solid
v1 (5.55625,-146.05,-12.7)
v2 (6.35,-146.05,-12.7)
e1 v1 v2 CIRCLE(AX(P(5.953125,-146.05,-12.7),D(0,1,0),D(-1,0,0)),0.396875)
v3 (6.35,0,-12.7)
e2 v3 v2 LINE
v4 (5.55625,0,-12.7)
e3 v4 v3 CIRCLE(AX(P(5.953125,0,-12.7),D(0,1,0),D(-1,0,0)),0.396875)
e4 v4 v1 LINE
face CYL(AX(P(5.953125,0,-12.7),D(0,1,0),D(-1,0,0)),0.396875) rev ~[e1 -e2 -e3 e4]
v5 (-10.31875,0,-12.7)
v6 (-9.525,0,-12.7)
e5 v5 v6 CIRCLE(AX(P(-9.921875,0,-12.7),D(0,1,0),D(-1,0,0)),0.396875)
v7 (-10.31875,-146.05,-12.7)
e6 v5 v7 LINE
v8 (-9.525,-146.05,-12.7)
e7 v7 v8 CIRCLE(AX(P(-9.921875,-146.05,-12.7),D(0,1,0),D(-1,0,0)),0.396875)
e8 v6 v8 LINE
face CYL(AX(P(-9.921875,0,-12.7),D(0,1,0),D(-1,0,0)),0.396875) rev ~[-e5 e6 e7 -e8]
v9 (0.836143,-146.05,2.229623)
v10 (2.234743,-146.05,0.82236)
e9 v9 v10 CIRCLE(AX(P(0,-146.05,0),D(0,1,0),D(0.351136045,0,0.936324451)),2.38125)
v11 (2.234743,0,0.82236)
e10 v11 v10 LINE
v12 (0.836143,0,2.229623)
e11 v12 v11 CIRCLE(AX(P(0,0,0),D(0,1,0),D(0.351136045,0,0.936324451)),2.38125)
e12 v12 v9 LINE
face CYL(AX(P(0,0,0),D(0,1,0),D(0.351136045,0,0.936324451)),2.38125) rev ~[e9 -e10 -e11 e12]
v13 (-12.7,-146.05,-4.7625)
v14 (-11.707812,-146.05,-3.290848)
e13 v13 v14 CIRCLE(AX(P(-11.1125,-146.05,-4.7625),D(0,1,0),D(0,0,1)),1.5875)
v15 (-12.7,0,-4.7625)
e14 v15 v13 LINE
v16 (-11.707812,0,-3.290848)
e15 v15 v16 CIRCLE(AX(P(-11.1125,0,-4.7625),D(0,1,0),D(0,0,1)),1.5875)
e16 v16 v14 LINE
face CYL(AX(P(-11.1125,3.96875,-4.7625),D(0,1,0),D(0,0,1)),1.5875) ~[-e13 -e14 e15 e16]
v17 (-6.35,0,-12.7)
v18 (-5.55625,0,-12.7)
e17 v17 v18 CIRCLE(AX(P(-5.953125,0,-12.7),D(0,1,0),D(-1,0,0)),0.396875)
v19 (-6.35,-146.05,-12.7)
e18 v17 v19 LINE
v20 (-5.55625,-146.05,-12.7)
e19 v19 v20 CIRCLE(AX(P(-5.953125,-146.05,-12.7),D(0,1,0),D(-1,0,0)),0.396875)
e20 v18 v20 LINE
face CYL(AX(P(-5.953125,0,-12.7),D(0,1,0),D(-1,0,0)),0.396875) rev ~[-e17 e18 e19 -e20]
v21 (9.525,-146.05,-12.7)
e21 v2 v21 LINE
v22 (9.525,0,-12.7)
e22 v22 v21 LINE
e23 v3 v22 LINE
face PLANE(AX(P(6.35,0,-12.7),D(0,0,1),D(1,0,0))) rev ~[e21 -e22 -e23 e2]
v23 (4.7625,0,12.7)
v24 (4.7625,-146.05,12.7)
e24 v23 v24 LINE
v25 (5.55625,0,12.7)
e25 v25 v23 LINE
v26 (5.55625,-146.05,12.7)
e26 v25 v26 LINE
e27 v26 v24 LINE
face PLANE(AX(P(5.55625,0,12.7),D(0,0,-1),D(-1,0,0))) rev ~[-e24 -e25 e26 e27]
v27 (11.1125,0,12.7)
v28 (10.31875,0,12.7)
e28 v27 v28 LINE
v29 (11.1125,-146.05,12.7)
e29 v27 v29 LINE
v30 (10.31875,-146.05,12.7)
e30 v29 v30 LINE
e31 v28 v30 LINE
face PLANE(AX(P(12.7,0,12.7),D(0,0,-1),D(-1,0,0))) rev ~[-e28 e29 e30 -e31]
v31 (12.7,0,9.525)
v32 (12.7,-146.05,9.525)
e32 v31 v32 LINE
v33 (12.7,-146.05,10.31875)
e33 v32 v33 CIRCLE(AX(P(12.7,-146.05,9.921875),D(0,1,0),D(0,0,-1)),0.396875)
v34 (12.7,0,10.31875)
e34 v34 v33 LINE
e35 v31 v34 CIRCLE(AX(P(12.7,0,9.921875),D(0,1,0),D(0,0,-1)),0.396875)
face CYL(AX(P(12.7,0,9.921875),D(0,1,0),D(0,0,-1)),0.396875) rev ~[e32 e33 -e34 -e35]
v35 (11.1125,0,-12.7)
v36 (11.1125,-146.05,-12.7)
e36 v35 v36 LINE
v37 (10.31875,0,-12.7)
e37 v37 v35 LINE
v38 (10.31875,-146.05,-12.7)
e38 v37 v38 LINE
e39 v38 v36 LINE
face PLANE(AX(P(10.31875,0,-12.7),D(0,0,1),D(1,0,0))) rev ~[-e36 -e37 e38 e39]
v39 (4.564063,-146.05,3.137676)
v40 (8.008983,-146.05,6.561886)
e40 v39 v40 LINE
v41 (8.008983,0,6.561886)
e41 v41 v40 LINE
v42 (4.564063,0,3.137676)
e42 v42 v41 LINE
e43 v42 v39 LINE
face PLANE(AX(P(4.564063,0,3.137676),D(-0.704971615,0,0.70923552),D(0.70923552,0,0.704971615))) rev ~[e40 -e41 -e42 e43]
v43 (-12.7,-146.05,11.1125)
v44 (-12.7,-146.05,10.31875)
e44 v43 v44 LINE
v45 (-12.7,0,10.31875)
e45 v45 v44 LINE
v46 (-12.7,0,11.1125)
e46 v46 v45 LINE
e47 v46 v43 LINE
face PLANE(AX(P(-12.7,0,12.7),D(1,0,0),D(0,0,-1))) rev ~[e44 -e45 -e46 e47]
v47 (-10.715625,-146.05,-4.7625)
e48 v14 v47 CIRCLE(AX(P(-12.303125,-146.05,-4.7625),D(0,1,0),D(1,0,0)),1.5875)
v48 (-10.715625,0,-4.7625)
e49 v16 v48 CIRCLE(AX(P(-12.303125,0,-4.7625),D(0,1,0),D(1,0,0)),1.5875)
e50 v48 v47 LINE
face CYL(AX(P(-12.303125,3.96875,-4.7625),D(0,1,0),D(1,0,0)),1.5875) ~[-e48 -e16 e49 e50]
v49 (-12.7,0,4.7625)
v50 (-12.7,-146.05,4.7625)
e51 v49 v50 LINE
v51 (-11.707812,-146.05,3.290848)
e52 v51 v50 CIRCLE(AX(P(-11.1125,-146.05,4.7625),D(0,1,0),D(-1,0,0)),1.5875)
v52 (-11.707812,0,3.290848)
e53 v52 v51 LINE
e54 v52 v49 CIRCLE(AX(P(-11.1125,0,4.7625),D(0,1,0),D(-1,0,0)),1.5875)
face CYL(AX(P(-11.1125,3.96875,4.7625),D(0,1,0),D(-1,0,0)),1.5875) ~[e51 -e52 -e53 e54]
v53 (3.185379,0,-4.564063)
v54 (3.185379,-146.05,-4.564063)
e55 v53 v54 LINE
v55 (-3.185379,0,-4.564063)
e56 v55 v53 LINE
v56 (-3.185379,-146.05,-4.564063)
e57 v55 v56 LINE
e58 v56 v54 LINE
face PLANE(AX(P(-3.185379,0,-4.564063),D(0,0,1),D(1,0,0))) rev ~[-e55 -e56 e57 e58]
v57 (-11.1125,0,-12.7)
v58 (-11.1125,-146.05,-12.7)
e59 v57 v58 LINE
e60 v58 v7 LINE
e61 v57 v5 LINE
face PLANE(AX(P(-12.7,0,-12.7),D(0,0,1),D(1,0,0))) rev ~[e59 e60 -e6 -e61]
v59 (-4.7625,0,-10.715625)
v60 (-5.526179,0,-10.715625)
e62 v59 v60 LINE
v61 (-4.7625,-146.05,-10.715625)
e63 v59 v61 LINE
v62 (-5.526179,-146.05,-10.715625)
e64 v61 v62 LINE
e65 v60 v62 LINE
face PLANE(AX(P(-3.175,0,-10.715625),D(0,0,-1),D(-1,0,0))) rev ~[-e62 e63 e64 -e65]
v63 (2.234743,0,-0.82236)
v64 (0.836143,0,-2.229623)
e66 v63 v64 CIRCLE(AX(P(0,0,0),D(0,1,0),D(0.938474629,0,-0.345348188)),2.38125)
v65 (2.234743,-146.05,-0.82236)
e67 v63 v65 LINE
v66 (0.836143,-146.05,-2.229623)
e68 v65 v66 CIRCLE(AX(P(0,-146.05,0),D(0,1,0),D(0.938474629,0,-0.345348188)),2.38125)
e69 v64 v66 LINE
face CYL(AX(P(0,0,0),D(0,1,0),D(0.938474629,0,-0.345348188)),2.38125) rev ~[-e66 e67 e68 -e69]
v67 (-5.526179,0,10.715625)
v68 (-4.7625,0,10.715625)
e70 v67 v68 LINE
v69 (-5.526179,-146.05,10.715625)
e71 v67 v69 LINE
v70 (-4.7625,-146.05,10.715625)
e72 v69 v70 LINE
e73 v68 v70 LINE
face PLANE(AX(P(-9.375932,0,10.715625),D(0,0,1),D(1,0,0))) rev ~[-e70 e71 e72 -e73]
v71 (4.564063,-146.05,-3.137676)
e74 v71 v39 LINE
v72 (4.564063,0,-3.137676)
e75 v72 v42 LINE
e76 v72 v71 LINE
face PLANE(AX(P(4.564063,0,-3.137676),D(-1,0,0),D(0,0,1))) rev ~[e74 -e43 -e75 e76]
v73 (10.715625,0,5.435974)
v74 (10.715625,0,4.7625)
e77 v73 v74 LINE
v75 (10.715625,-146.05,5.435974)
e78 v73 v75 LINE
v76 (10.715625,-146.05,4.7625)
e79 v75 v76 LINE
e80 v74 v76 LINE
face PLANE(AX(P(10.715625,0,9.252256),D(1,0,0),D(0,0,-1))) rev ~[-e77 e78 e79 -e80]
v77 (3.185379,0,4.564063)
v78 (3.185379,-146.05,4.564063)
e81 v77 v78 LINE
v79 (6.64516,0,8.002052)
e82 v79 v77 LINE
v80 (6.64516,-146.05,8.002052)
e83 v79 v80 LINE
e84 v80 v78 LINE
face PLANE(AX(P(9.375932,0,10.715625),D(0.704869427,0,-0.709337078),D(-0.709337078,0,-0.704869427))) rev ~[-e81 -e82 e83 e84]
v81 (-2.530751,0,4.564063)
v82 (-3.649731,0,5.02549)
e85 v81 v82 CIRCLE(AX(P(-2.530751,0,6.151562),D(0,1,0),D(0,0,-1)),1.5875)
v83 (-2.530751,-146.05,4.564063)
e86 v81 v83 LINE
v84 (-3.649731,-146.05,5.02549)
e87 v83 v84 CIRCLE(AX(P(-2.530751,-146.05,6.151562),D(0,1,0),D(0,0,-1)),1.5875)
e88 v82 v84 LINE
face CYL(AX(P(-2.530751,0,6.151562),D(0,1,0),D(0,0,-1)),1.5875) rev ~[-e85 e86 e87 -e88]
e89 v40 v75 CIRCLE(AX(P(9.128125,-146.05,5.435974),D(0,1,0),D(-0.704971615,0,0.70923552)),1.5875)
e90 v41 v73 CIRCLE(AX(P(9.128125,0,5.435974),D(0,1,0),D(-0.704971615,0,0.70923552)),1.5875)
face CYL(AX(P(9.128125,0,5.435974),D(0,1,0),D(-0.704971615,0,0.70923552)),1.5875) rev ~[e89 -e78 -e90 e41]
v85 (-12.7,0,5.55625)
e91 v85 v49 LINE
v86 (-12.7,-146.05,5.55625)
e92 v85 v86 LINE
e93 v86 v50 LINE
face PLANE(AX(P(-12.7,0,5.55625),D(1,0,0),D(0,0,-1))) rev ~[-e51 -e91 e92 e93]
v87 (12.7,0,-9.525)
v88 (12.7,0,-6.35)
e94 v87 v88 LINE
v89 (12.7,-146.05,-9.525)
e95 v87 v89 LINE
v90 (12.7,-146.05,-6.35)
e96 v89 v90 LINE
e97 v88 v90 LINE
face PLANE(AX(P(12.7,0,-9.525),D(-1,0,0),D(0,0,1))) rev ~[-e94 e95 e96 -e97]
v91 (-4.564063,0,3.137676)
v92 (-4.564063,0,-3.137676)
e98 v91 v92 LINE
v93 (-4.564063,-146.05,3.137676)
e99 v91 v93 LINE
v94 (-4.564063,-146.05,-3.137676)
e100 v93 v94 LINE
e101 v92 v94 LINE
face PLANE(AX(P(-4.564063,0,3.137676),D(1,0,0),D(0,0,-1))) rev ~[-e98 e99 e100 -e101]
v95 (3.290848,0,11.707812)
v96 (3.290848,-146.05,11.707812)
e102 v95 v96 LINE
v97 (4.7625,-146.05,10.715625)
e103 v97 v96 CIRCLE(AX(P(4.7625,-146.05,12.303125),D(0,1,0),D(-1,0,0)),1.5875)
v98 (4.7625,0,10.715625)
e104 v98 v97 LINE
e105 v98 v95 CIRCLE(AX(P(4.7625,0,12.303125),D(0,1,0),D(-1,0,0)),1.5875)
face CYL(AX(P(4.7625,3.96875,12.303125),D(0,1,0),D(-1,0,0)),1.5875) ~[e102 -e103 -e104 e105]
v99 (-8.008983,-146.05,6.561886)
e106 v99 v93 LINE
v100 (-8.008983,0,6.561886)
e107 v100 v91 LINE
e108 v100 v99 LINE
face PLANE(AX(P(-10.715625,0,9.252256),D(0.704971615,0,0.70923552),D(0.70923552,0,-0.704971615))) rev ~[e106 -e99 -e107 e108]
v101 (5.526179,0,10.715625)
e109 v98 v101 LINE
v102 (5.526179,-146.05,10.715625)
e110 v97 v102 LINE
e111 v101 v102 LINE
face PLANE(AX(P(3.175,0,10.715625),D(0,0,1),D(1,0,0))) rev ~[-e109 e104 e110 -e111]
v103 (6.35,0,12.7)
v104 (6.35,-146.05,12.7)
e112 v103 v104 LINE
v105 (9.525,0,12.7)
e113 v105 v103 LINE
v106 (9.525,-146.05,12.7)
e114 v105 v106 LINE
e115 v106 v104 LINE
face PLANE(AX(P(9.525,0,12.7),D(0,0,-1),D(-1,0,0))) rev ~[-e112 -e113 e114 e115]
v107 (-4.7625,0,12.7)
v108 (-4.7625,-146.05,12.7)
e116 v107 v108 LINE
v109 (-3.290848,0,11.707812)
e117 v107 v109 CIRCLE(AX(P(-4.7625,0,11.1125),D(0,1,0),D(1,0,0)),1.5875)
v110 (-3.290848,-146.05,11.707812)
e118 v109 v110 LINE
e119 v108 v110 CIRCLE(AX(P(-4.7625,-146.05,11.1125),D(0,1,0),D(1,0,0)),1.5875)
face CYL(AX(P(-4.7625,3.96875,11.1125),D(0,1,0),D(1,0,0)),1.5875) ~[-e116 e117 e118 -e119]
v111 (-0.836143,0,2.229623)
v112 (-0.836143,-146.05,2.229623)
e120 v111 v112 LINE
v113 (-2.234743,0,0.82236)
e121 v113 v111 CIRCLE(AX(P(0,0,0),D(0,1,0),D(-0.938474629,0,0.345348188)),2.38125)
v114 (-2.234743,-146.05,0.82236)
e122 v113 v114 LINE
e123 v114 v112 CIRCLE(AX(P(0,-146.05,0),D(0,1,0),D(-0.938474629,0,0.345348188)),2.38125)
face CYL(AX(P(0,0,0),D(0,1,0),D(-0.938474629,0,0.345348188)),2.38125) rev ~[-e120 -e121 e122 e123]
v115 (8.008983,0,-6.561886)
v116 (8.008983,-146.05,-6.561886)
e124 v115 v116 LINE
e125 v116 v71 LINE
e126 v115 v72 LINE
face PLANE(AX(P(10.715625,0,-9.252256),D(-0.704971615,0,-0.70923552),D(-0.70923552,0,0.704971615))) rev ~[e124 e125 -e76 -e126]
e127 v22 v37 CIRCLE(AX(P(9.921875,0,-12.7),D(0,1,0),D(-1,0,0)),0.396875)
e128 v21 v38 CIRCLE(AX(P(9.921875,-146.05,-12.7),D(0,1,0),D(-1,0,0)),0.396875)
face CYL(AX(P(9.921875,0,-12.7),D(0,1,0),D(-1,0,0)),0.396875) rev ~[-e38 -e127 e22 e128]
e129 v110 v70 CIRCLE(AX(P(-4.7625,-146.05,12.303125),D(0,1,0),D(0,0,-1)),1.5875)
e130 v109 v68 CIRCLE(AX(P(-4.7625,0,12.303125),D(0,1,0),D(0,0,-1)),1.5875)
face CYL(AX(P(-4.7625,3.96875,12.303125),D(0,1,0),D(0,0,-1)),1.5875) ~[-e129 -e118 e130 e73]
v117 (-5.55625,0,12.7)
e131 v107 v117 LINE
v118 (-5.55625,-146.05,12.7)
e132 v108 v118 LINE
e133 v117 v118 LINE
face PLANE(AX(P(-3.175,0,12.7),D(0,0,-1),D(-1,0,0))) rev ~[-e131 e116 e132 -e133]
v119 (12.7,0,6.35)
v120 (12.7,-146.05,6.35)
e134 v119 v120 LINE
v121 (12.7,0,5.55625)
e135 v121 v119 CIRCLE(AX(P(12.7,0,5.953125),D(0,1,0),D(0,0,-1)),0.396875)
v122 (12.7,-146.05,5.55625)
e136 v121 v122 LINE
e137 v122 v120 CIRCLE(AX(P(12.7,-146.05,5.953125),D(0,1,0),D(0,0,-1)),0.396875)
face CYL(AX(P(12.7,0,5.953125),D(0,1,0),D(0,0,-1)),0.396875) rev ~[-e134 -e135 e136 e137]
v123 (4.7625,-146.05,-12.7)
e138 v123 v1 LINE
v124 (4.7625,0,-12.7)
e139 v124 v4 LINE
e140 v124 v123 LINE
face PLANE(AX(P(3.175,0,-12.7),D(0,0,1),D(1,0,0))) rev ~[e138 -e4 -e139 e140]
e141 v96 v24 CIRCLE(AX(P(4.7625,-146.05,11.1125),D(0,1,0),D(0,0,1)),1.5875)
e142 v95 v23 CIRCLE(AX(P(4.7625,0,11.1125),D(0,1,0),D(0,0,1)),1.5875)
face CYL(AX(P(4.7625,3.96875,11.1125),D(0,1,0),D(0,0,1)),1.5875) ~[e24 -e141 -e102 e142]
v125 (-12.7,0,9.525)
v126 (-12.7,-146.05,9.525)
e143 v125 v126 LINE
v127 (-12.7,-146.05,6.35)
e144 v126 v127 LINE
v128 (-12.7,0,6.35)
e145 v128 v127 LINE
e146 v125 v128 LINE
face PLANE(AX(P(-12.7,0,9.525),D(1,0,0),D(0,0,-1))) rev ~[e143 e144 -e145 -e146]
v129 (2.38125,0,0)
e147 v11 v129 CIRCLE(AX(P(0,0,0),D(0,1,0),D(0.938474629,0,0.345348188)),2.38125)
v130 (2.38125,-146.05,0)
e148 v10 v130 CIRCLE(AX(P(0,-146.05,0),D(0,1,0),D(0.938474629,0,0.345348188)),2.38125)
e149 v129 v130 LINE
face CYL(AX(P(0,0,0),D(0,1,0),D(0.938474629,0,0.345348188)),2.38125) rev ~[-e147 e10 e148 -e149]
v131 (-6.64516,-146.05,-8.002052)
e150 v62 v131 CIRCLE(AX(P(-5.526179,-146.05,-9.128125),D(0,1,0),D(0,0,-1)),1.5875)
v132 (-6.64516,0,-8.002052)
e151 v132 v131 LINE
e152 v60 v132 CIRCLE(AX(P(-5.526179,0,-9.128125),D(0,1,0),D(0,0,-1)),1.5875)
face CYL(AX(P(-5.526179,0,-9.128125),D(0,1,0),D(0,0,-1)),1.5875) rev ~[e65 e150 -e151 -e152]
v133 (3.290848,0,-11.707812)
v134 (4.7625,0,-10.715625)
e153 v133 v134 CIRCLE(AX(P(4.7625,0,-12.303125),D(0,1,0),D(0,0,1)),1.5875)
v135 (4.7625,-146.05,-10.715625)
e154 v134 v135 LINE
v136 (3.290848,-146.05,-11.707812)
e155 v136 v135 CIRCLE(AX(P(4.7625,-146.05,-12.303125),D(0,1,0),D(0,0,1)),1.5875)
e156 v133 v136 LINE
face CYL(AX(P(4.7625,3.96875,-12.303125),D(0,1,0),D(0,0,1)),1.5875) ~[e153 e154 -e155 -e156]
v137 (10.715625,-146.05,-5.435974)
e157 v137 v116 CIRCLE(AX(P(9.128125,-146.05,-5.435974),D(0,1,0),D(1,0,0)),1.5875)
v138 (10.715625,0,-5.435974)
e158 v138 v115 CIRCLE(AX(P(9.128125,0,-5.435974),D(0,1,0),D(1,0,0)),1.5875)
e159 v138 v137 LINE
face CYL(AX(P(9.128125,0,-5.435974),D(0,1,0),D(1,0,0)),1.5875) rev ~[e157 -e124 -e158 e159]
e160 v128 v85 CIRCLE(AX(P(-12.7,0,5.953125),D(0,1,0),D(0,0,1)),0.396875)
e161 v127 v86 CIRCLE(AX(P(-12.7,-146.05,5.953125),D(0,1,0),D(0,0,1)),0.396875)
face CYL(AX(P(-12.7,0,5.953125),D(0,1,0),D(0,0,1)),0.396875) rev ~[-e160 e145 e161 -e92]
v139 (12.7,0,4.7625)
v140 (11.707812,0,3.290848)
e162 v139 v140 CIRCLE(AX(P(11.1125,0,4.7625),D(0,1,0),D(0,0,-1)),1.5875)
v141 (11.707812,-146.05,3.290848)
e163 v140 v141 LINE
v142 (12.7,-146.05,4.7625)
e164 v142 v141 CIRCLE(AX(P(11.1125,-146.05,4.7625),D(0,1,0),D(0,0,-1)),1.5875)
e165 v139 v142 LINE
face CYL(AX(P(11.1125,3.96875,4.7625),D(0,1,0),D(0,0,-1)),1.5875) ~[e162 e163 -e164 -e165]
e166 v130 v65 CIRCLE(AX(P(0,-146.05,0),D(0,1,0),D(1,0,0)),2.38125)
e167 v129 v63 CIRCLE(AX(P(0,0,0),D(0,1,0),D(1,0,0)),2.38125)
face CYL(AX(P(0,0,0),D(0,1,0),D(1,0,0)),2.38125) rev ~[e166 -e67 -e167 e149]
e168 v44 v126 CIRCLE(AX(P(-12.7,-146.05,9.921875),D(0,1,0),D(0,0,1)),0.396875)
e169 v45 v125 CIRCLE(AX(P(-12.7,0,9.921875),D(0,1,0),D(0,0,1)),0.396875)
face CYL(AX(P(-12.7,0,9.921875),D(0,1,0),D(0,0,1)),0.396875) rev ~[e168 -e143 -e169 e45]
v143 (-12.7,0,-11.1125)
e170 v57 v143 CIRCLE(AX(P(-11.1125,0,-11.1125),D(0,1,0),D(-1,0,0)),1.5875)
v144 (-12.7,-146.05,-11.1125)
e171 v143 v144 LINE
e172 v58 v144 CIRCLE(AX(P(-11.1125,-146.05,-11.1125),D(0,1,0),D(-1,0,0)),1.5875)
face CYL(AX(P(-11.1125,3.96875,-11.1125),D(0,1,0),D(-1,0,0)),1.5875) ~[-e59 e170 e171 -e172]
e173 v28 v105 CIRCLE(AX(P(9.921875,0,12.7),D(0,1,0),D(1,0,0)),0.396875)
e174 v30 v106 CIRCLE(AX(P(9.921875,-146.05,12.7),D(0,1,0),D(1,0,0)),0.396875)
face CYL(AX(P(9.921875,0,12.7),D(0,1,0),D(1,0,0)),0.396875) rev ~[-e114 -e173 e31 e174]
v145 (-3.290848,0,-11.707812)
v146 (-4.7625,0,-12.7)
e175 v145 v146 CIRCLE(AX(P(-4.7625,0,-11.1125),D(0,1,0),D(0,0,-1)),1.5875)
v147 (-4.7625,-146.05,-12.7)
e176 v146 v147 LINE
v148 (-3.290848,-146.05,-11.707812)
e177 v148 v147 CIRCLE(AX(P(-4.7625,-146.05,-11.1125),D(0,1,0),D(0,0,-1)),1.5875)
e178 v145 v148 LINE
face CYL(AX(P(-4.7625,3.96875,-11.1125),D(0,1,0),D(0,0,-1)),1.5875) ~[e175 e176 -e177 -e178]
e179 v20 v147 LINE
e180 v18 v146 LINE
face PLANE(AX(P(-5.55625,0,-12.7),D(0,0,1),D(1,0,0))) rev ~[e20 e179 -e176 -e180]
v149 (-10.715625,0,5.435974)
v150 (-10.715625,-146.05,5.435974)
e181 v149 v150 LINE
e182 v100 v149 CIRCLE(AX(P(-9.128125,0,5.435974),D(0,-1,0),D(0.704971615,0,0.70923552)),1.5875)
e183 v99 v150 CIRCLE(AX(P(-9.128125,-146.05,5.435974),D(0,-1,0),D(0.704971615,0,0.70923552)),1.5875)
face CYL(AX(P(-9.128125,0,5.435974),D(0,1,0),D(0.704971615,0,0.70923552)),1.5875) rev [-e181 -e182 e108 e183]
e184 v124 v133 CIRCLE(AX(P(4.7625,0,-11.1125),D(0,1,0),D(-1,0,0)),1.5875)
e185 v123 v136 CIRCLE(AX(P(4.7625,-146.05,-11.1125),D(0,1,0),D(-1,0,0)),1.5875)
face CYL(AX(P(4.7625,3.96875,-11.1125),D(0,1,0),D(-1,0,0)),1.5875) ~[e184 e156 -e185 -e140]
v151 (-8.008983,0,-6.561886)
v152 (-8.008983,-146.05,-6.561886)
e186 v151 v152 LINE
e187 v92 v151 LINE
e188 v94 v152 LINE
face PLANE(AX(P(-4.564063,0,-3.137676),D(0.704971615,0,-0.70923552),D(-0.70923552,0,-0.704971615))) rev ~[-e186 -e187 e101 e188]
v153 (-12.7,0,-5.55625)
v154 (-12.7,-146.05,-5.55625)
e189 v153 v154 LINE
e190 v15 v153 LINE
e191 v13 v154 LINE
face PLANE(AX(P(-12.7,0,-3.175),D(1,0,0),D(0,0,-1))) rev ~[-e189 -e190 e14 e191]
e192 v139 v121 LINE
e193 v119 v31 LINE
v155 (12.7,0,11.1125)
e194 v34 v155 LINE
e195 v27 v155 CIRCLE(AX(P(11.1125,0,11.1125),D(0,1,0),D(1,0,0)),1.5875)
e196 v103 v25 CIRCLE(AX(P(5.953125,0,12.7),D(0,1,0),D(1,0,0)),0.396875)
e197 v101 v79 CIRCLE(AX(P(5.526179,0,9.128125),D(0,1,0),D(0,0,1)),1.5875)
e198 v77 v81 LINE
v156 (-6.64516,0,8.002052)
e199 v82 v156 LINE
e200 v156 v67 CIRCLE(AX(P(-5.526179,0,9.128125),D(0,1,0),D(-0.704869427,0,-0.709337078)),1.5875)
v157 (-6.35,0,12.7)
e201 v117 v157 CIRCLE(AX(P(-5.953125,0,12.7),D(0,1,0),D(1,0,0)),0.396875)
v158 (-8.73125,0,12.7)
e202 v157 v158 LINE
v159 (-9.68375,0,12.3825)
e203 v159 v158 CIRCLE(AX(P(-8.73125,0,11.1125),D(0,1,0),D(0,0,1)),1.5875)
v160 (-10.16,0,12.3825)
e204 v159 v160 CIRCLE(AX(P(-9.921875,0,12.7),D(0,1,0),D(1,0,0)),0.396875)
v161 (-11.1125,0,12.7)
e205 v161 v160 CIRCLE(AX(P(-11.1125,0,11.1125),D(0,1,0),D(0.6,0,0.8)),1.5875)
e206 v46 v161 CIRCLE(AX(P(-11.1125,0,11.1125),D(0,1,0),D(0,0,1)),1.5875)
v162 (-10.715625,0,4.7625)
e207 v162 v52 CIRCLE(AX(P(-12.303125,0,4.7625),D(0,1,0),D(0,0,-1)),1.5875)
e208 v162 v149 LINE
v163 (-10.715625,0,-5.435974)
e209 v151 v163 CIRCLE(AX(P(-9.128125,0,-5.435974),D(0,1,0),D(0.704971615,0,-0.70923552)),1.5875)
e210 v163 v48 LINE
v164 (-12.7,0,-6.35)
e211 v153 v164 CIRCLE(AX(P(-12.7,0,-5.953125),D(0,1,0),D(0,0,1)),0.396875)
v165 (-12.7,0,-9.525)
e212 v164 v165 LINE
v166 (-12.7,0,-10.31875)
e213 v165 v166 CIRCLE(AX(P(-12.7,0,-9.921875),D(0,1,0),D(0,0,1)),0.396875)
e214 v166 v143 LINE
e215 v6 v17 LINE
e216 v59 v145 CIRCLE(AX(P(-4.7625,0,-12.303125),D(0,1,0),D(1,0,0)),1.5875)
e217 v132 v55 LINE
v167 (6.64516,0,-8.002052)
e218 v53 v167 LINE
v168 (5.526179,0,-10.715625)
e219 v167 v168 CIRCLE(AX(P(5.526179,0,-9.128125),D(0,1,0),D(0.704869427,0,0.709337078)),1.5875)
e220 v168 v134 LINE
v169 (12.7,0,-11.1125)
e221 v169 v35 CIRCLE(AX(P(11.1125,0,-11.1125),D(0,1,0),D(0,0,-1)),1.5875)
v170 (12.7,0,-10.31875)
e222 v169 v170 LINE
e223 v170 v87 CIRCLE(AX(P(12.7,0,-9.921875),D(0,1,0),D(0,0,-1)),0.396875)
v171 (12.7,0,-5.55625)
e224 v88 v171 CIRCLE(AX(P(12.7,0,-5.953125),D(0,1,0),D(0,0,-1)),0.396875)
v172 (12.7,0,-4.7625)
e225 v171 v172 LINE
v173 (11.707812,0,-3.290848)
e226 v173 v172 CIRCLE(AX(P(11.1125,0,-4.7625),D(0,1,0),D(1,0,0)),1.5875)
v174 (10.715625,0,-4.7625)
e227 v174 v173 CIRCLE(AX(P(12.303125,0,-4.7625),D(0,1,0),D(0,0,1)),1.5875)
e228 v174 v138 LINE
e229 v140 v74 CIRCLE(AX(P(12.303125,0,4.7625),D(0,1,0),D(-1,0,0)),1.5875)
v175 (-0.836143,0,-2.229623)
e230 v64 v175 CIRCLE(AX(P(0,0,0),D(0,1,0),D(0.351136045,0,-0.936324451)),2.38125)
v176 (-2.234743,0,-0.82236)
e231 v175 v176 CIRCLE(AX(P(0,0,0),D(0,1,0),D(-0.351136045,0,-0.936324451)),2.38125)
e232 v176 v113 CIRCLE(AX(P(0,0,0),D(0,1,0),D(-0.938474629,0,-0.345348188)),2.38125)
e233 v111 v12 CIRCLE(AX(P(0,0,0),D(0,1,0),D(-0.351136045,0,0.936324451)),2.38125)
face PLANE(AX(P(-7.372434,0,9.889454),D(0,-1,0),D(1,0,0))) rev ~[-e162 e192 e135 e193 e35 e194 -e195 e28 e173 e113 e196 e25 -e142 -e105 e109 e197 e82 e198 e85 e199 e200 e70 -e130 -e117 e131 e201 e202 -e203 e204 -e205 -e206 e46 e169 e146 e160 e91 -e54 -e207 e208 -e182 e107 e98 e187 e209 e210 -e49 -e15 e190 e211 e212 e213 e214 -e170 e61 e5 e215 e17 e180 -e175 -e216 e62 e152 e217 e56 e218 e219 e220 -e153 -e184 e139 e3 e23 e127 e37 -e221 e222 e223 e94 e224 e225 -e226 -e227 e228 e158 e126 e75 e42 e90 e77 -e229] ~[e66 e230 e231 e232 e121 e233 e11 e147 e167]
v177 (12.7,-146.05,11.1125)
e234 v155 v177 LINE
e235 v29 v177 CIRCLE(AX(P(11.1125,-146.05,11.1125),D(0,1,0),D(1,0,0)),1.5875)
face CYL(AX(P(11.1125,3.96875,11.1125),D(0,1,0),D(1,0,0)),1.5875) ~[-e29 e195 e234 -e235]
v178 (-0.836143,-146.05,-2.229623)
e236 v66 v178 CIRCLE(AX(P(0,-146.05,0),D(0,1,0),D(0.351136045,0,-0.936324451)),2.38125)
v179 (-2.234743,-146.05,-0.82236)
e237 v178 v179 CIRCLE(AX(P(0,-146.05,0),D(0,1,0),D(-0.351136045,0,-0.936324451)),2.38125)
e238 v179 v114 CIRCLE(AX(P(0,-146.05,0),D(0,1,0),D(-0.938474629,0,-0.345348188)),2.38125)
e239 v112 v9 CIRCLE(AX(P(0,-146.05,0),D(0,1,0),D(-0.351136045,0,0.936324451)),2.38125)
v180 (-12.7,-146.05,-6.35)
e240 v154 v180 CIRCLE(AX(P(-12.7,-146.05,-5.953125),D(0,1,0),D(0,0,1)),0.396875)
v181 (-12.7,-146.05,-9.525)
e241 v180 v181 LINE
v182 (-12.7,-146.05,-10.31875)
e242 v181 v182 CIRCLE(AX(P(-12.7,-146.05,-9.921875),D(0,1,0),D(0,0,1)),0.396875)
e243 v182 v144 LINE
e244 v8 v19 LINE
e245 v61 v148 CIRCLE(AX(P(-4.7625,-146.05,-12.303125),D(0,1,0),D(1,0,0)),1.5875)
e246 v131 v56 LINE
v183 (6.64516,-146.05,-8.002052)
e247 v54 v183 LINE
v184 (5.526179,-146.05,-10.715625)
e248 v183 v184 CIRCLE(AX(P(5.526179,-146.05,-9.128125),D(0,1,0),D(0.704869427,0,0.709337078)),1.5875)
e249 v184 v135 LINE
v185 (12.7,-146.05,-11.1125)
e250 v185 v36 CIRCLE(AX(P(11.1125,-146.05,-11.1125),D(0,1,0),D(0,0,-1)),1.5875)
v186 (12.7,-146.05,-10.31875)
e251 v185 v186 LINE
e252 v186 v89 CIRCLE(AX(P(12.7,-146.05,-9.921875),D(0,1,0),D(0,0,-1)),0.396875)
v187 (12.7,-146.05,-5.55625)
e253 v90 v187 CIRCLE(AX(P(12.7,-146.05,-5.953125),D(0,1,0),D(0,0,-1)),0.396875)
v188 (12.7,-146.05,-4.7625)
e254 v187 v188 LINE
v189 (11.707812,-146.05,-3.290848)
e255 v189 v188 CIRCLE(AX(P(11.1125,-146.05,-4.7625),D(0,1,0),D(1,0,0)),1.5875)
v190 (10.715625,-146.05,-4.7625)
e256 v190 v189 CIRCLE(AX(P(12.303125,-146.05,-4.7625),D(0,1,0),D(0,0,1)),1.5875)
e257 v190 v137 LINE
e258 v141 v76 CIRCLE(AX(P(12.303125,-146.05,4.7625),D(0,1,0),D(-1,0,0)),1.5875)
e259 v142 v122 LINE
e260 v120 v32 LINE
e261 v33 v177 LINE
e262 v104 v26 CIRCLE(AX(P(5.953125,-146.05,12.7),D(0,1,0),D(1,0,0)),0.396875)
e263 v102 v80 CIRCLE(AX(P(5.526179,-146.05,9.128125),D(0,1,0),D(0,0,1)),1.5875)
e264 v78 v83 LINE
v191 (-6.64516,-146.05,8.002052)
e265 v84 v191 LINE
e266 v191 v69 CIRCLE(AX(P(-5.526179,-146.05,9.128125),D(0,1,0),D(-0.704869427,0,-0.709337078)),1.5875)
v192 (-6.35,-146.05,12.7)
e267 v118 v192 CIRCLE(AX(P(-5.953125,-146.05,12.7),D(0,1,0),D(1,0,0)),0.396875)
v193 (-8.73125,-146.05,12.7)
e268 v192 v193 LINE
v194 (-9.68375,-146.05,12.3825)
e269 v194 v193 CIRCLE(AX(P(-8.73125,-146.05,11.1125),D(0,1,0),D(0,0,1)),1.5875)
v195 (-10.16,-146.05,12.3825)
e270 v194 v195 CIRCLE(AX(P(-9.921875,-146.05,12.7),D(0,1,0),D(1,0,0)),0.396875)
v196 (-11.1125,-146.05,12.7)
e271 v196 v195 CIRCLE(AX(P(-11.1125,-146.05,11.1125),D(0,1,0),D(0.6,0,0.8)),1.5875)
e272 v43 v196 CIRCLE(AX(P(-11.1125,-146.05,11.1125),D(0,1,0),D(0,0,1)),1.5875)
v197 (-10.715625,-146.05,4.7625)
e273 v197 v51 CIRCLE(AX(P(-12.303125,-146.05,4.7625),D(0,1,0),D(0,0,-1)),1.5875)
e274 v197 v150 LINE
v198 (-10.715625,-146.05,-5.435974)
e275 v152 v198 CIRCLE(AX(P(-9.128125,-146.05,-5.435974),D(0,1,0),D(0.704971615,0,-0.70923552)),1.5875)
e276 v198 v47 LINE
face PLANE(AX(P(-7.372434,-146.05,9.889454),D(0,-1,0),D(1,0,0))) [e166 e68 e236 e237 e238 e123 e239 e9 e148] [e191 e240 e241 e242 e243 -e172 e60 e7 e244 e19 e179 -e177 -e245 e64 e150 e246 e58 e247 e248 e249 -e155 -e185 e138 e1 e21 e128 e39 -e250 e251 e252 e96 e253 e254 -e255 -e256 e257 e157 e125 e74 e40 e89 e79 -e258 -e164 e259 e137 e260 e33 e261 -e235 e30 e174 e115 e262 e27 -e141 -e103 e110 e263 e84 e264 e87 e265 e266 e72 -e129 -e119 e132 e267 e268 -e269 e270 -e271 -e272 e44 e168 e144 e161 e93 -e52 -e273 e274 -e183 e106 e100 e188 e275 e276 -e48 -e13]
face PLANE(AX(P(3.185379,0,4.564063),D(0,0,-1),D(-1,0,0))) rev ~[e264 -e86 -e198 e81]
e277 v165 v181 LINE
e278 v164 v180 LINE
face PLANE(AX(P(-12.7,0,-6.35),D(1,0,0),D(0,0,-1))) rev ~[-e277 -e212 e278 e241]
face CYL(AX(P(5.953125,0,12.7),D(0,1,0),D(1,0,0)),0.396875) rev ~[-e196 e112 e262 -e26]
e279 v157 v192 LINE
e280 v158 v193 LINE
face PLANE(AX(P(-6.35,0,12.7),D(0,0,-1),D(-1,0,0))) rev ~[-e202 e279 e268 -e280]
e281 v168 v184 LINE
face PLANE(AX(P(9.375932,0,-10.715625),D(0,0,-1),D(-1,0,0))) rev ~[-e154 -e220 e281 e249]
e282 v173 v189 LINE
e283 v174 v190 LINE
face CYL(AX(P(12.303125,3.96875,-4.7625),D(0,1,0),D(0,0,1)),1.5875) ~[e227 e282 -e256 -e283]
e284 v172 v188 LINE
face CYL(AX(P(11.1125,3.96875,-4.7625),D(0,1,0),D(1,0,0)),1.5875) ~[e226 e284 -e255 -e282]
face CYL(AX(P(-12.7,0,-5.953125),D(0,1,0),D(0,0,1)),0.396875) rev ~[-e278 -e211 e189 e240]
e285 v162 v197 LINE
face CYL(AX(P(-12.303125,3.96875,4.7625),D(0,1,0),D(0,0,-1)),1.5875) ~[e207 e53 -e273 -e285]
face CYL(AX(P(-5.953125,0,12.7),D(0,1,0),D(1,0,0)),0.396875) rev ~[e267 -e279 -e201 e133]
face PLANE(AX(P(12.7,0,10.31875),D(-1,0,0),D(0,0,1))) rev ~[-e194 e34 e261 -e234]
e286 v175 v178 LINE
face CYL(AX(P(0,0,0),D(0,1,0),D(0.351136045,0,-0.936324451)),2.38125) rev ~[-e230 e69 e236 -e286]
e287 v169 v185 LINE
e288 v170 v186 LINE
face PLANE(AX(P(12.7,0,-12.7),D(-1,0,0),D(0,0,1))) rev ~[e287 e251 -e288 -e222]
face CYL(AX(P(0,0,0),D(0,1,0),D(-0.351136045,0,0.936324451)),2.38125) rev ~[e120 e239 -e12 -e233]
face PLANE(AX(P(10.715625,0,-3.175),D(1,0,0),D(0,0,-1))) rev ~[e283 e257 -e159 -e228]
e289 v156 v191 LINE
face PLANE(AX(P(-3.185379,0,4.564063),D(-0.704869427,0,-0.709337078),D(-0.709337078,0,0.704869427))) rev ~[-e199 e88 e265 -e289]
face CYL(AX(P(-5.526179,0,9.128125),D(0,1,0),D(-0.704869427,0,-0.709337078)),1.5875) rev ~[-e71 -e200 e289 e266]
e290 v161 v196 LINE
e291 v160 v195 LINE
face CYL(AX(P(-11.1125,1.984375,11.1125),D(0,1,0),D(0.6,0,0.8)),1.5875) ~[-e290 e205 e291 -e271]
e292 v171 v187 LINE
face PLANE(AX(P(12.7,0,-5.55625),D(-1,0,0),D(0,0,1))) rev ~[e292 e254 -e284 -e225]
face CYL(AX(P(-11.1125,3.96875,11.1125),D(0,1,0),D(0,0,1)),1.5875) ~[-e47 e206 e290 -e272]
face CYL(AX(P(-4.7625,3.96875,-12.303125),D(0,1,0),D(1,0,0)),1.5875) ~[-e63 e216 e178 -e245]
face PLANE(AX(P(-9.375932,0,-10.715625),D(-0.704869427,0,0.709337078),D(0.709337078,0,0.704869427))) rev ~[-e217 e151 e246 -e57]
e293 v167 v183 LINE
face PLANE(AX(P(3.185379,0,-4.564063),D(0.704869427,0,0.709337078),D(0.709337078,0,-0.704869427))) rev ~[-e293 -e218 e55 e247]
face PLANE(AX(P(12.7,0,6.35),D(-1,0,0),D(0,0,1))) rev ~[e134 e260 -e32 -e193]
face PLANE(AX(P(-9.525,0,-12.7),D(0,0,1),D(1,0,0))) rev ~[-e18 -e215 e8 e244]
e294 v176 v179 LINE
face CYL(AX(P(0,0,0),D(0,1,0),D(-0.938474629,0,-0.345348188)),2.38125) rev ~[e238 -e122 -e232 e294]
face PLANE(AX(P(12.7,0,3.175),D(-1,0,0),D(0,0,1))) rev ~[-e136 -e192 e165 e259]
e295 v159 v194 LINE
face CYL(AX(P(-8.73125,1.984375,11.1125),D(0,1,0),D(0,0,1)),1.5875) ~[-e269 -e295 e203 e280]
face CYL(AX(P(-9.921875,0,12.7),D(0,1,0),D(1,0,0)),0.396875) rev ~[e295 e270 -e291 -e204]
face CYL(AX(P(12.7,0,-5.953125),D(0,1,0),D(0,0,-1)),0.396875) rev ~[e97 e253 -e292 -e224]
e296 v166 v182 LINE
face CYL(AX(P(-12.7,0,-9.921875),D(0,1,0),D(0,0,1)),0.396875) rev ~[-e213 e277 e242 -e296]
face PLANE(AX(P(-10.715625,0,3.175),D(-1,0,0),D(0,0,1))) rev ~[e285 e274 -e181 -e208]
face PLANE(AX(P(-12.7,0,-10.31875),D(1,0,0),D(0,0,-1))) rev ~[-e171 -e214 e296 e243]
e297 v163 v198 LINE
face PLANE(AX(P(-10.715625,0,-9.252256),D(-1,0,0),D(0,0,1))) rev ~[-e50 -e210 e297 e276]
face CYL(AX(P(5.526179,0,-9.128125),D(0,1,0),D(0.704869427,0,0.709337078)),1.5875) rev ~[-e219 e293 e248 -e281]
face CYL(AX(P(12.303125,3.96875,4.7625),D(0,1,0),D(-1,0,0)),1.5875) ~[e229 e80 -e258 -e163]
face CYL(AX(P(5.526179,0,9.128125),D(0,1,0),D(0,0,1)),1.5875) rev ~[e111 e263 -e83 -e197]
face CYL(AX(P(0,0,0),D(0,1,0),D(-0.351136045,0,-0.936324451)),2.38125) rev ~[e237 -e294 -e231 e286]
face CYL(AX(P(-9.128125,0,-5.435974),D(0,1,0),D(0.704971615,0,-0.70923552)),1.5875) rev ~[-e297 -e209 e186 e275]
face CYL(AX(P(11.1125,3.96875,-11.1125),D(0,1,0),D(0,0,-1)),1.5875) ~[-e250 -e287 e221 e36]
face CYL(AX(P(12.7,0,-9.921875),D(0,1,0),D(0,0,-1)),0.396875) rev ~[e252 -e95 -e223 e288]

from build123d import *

# Parameters (mm, degrees)
F1_DEPTH    = 146.05
F2_T1_DEPTH = 146.05
F2_T3_DEPTH = 153.9875
F2_T5_DEPTH = 150.01875


# Not quite as in the source:
# - a fillet or chamfer that OpenCascade refuses, or shapes differently, is made with other operations: its cross-section is extruded or revolved along the edge and cut away or added


with BuildPart() as f1:
    # F0 (on Front) → F1 (new body)
    with BuildSketch(Plane.XZ):
        with BuildLine():
            ThreePointArc((-0.8361427067, 2.2296225996), (0, 2.38125), (0.8361427067, 2.2296225996))
            Line((0.8361427067, 2.2296225996), (3.1853789104, 4.5640625))
            Line((3.1853789104, 4.5640625), (-3.1853789104, 4.5640625))
            Line((-3.1853789104, 4.5640625), (-0.8361427067, 2.2296225996))
        make_face()
        with BuildLine():
            ThreePointArc((-2.2347427098, 0.8223603732), (-1.6889881746, 1.6785918231), (-0.8361427067, 2.2296225996))
            Line((-0.8361427067, 2.2296225996), (-3.1853789104, 4.5640625))
            Line((-3.1853789104, 4.5640625), (-4.5640625, 4.5640625))
            Line((-4.5640625, 4.5640625), (-4.5640625, 3.1376763557))
            Line((-4.5640625, 3.1376763557), (-2.2347427098, 0.8223603732))
        make_face()
        with BuildLine():
            ThreePointArc((-2.2347427098, -0.8223603732), (-2.38125, 0), (-2.2347427098, 0.8223603732))
            Line((-2.2347427098, 0.8223603732), (-4.5640625, 3.1376763557))
            Line((-4.5640625, 3.1376763557), (-4.5640625, -3.1376763557))
            Line((-4.5640625, -3.1376763557), (-2.2347427098, -0.8223603732))
        make_face()
        with BuildLine():
            Line((-3.1853789104, -4.5640625), (-0.8361427067, -2.2296225996))
            ThreePointArc((-0.8361427067, -2.2296225996), (-1.6889881746, -1.6785918231), (-2.2347427098, -0.8223603732))
            Line((-2.2347427098, -0.8223603732), (-4.5640625, -3.1376763557))
            Line((-4.5640625, -3.1376763557), (-4.5640625, -4.5640625))
            Line((-4.5640625, -4.5640625), (-3.1853789104, -4.5640625))
        make_face()
        with BuildLine():
            Line((3.1853789104, -4.5640625), (0.8361427067, -2.2296225996))
            ThreePointArc((0.8361427067, -2.2296225996), (0, -2.38125), (-0.8361427067, -2.2296225996))
            Line((-0.8361427067, -2.2296225996), (-3.1853789104, -4.5640625))
            Line((-3.1853789104, -4.5640625), (3.1853789104, -4.5640625))
        make_face()
        with BuildLine():
            Line((4.5640625, -3.1376763557), (2.2347427098, -0.8223603732))
            ThreePointArc((2.2347427098, -0.8223603732), (1.6889881746, -1.6785918231), (0.8361427067, -2.2296225996))
            Line((0.8361427067, -2.2296225996), (3.1853789104, -4.5640625))
            Line((3.1853789104, -4.5640625), (4.5640625, -4.5640625))
            Line((4.5640625, -4.5640625), (4.5640625, -3.1376763557))
        make_face()
        with BuildLine():
            ThreePointArc((2.2347427098, 0.8223603732), (2.3443370748, 0.4176544533), (2.38125, 0))
            ThreePointArc((2.38125, 0), (2.3443370748, -0.4176544533), (2.2347427098, -0.8223603732))
            Line((2.2347427098, -0.8223603732), (4.5640625, -3.1376763557))
            Line((4.5640625, -3.1376763557), (4.5640625, 3.1376763557))
            Line((4.5640625, 3.1376763557), (2.2347427098, 0.8223603732))
        make_face()
        with BuildLine():
            ThreePointArc((0.8361427067, 2.2296225996), (1.6889881746, 1.6785918231), (2.2347427098, 0.8223603732))
            Line((2.2347427098, 0.8223603732), (4.5640625, 3.1376763557))
            Line((4.5640625, 3.1376763557), (4.5640625, 4.5640625))
            Line((4.5640625, 4.5640625), (3.1853789104, 4.5640625))
            Line((3.1853789104, 4.5640625), (0.8361427067, 2.2296225996))
        make_face()
        Polygon((4.5640625, 4.5640625), (4.5640625, 3.1376763557), (10.715625, 9.2522558281), (12.7, 11.2247008192), (12.7, 12.7), (11.3728841543, 12.7), (9.3759316558, 10.715625), (3.1853789104, 4.5640625), align=None)
        with BuildLine():
            Line((12.7, 11.2247008192), (10.715625, 9.2522558281))
            Line((10.715625, 9.2522558281), (10.715625, 7.14375))
            Line((10.715625, 7.14375), (10.715625, 3.175))
            Line((10.715625, 3.175), (12.7, 3.175))
            Line((12.7, 3.175), (12.7, 5.55625))
            ThreePointArc((12.7, 5.55625), (12.303125, 5.953125), (12.7, 6.35))
            Line((12.7, 6.35), (12.7, 9.525))
            ThreePointArc((12.7, 9.525), (12.303125, 9.921875), (12.7, 10.31875))
            Line((12.7, 10.31875), (12.7, 11.2247008192))
        make_face()
        with BuildLine():
            Line((7.14375, 10.715625), (9.3759316558, 10.715625))
            Line((9.3759316558, 10.715625), (11.3728841543, 12.7))
            Line((11.3728841543, 12.7), (10.31875, 12.7))
            ThreePointArc((10.31875, 12.7), (9.921875, 12.303125), (9.525, 12.7))
            Line((9.525, 12.7), (6.35, 12.7))
            ThreePointArc((6.35, 12.7), (5.953125, 12.303125), (5.55625, 12.7))
            Line((5.55625, 12.7), (3.175, 12.7))
            Line((3.175, 12.7), (3.175, 10.715625))
            Line((3.175, 10.715625), (7.14375, 10.715625))
        make_face()
        with BuildLine():
            Line((-11.3728841543, 12.7), (-9.3759316558, 10.715625))
            Line((-9.3759316558, 10.715625), (-7.14375, 10.715625))
            Line((-7.14375, 10.715625), (-3.175, 10.715625))
            Line((-3.175, 10.715625), (-3.175, 12.7))
            Line((-3.175, 12.7), (-5.55625, 12.7))
            ThreePointArc((-5.55625, 12.7), (-5.953125, 12.303125), (-6.35, 12.7))
            Line((-6.35, 12.7), (-7.14375, 12.7))
            Line((-7.14375, 12.7), (-9.525, 12.7))
            ThreePointArc((-9.525, 12.7), (-9.921875, 12.303125), (-10.31875, 12.7))
            Line((-10.31875, 12.7), (-11.3728841543, 12.7))
        make_face()
        Polygon((-4.5640625, 4.5640625), (-3.1853789104, 4.5640625), (-9.3759316558, 10.715625), (-11.3728841543, 12.7), (-12.7, 11.2247008192), (-10.715625, 9.2522558281), (-4.5640625, 3.1376763557), align=None)
        Polygon((-12.7, 11.2247008192), (-11.3728841543, 12.7), (-12.7, 12.7), align=None)
        with BuildLine():
            Line((-10.715625, 7.14375), (-10.715625, 9.2522558281))
            Line((-10.715625, 9.2522558281), (-12.7, 11.2247008192))
            Line((-12.7, 11.2247008192), (-12.7, 10.31875))
            ThreePointArc((-12.7, 10.31875), (-12.303125, 9.921875), (-12.7, 9.525))
            Line((-12.7, 9.525), (-12.7, 6.35))
            ThreePointArc((-12.7, 6.35), (-12.303125, 5.953125), (-12.7, 5.55625))
            Line((-12.7, 5.55625), (-12.7, 3.175))
            Line((-12.7, 3.175), (-10.715625, 3.175))
            Line((-10.715625, 3.175), (-10.715625, 7.14375))
        make_face()
        with BuildLine():
            Line((-12.7, -11.2247008192), (-10.715625, -9.2522558281))
            Line((-10.715625, -9.2522558281), (-10.715625, -7.14375))
            Line((-10.715625, -7.14375), (-10.715625, -3.175))
            Line((-10.715625, -3.175), (-12.7, -3.175))
            Line((-12.7, -3.175), (-12.7, -5.55625))
            ThreePointArc((-12.7, -5.55625), (-12.303125, -5.953125), (-12.7, -6.35))
            Line((-12.7, -6.35), (-12.7, -9.525))
            ThreePointArc((-12.7, -9.525), (-12.303125, -9.921875), (-12.7, -10.31875))
            Line((-12.7, -10.31875), (-12.7, -11.2247008192))
        make_face()
        Polygon((-9.3759316558, -10.715625), (-3.1853789104, -4.5640625), (-4.5640625, -4.5640625), (-4.5640625, -3.1376763557), (-10.715625, -9.2522558281), (-12.7, -11.2247008192), (-12.7, -12.7), (-11.3728841543, -12.7), align=None)
        with BuildLine():
            Line((-7.14375, -10.715625), (-9.3759316558, -10.715625))
            Line((-9.3759316558, -10.715625), (-11.3728841543, -12.7))
            Line((-11.3728841543, -12.7), (-10.31875, -12.7))
            ThreePointArc((-10.31875, -12.7), (-9.921875, -12.303125), (-9.525, -12.7))
            Line((-9.525, -12.7), (-6.35, -12.7))
            ThreePointArc((-6.35, -12.7), (-5.953125, -12.303125), (-5.55625, -12.7))
            Line((-5.55625, -12.7), (-3.175, -12.7))
            Line((-3.175, -12.7), (-3.175, -10.715625))
            Line((-3.175, -10.715625), (-7.14375, -10.715625))
        make_face()
        with BuildLine():
            Line((11.3728841543, -12.7), (9.3759316558, -10.715625))
            Line((9.3759316558, -10.715625), (7.14375, -10.715625))
            Line((7.14375, -10.715625), (3.175, -10.715625))
            Line((3.175, -10.715625), (3.175, -12.7))
            Line((3.175, -12.7), (5.55625, -12.7))
            ThreePointArc((5.55625, -12.7), (5.953125, -12.303125), (6.35, -12.7))
            Line((6.35, -12.7), (9.525, -12.7))
            ThreePointArc((9.525, -12.7), (9.921875, -12.303125), (10.31875, -12.7))
            Line((10.31875, -12.7), (11.3728841543, -12.7))
        make_face()
        Polygon((10.715625, -9.2522558281), (4.5640625, -3.1376763557), (4.5640625, -4.5640625), (3.1853789104, -4.5640625), (9.3759316558, -10.715625), (11.3728841543, -12.7), (12.7, -12.7), (12.7, -11.2247008192), align=None)
        with BuildLine():
            Line((10.715625, -7.14375), (10.715625, -9.2522558281))
            Line((10.715625, -9.2522558281), (12.7, -11.2247008192))
            Line((12.7, -11.2247008192), (12.7, -10.31875))
            ThreePointArc((12.7, -10.31875), (12.303125, -9.921875), (12.7, -9.525))
            Line((12.7, -9.525), (12.7, -6.35))
            ThreePointArc((12.7, -6.35), (12.303125, -5.953125), (12.7, -5.55625))
            Line((12.7, -5.55625), (12.7, -3.175))
            Line((12.7, -3.175), (10.715625, -3.175))
            Line((10.715625, -3.175), (10.715625, -7.14375))
        make_face()
    extrude(amount=F1_DEPTH)

    # F2: fillet of radius 1.5875 on 31 edges, made by hand

    # F2_s2 → F2_t1 (join)
    with BuildSketch(Plane.XZ):
        with BuildLine():
            ThreePointArc((-6.6451596968, 8.0020523886), (-6.9937960043, 9.7333175229), (-5.5261794807, 10.715625))
            Line((-5.5261794807, 10.715625), (-9.3759316558, 10.715625))
            Line((-9.3759316558, 10.715625), (-6.6451596968, 8.0020523886))
        make_face()
        with BuildLine():
            ThreePointArc((-8.0089825615, 6.5618856508), (-9.7378452755, 6.9017155215), (-10.715625, 5.4359742634))
            Line((-10.715625, 5.4359742634), (-10.715625, 9.2522558281))
            Line((-10.715625, 9.2522558281), (-8.0089825615, 6.5618856508))
        make_face()
        with BuildLine():
            ThreePointArc((5.5261794807, 10.715625), (6.9937960043, 9.7333175229), (6.6451596968, 8.0020523886))
            Line((6.6451596968, 8.0020523886), (9.3759316558, 10.715625))
            Line((9.3759316558, 10.715625), (5.5261794807, 10.715625))
        make_face()
        with BuildLine():
            ThreePointArc((8.0089825615, 6.5618856508), (9.7378452755, 6.9017155215), (10.715625, 5.4359742634))
            Line((10.715625, 5.4359742634), (10.715625, 9.2522558281))
            Line((10.715625, 9.2522558281), (8.0089825615, 6.5618856508))
        make_face()
        with BuildLine():
            ThreePointArc((10.715625, -5.4359742634), (9.7378452755, -6.9017155215), (8.0089825615, -6.5618856508))
            Line((8.0089825615, -6.5618856508), (10.715625, -9.2522558281))
            Line((10.715625, -9.2522558281), (10.715625, -5.4359742634))
        make_face()
        with BuildLine():
            ThreePointArc((6.6451596968, -8.0020523886), (6.9937960043, -9.7333175229), (5.5261794807, -10.715625))
            Line((5.5261794807, -10.715625), (9.3759316558, -10.715625))
            Line((9.3759316558, -10.715625), (6.6451596968, -8.0020523886))
        make_face()
        with BuildLine():
            ThreePointArc((-5.5261794807, -10.715625), (-6.9937960043, -9.7333175229), (-6.6451596968, -8.0020523886))
            Line((-6.6451596968, -8.0020523886), (-9.3759316558, -10.715625))
            Line((-9.3759316558, -10.715625), (-5.5261794807, -10.715625))
        make_face()
        with BuildLine():
            ThreePointArc((-8.0089825615, -6.5618856508), (-9.7378452755, -6.9017155215), (-10.715625, -5.4359742634))
            Line((-10.715625, -5.4359742634), (-10.715625, -9.2522558281))
            Line((-10.715625, -9.2522558281), (-8.0089825615, -6.5618856508))
        make_face()
        with BuildLine():
            ThreePointArc((-2.530750733, 4.5640625), (-3.1359432558, 4.6839459764), (-3.649730949, 5.0254898886))
            Line((-3.649730949, 5.0254898886), (-3.1853789104, 4.5640625))
            Line((-3.1853789104, 4.5640625), (-2.530750733, 4.5640625))
        make_face()
    extrude(amount=F2_T1_DEPTH)

    # F2_s4 → F2_t3 (cut)
    with BuildSketch(Plane.XZ.offset(-3.96875)):
        with BuildLine():
            ThreePointArc((-12.7, -11.1125), (-12.2350320151, -12.2350320151), (-11.1125, -12.7))
            Line((-11.1125, -12.7), (-12.7, -12.7))
            Line((-12.7, -12.7), (-12.7, -11.1125))
        make_face()
        with BuildLine():
            ThreePointArc((11.1125, -12.7), (12.2350320151, -12.2350320151), (12.7, -11.1125))
            Line((12.7, -11.1125), (12.7, -12.7))
            Line((12.7, -12.7), (11.1125, -12.7))
        make_face()
        with BuildLine():
            ThreePointArc((12.7, 11.1125), (12.2350320151, 12.2350320151), (11.1125, 12.7))
            Line((11.1125, 12.7), (12.7, 12.7))
            Line((12.7, 12.7), (12.7, 11.1125))
        make_face()
        with BuildLine():
            ThreePointArc((-12.7, 4.7625), (-12.2350320151, 3.6399679849), (-11.1125, 3.175))
            Line((-11.1125, 3.175), (-12.7, 3.175))
            Line((-12.7, 3.175), (-12.7, 4.7625))
        make_face()
        with BuildLine():
            ThreePointArc((-11.1125, -3.175), (-12.2350320151, -3.6399679849), (-12.7, -4.7625))
            Line((-12.7, -4.7625), (-12.7, -3.175))
            Line((-12.7, -3.175), (-11.1125, -3.175))
        make_face()
        with BuildLine():
            ThreePointArc((-12.303125, 3.175), (-11.1805929849, 3.6399679849), (-10.715625, 4.7625))
            Line((-10.715625, 4.7625), (-10.715625, 3.175))
            Line((-10.715625, 3.175), (-12.303125, 3.175))
        make_face()
        with BuildLine():
            ThreePointArc((-10.715625, -4.7625), (-11.1805929849, -3.6399679849), (-12.303125, -3.175))
            Line((-12.303125, -3.175), (-10.715625, -3.175))
            Line((-10.715625, -3.175), (-10.715625, -4.7625))
        make_face()
        with BuildLine():
            ThreePointArc((-3.175, -12.303125), (-3.6399679849, -11.1805929849), (-4.7625, -10.715625))
            Line((-4.7625, -10.715625), (-3.175, -10.715625))
            Line((-3.175, -10.715625), (-3.175, -12.303125))
        make_face()
        with BuildLine():
            ThreePointArc((-4.7625, -12.7), (-3.6399679849, -12.2350320151), (-3.175, -11.1125))
            Line((-3.175, -11.1125), (-3.175, -12.7))
            Line((-3.175, -12.7), (-4.7625, -12.7))
        make_face()
        with BuildLine():
            ThreePointArc((3.175, -11.1125), (3.6399679849, -12.2350320151), (4.7625, -12.7))
            Line((4.7625, -12.7), (3.175, -12.7))
            Line((3.175, -12.7), (3.175, -11.1125))
        make_face()
        with BuildLine():
            ThreePointArc((4.7625, -10.715625), (3.6399679849, -11.1805929849), (3.175, -12.303125))
            Line((3.175, -12.303125), (3.175, -10.715625))
            Line((3.175, -10.715625), (4.7625, -10.715625))
        make_face()
        with BuildLine():
            ThreePointArc((12.7, -4.7625), (12.2350320151, -3.6399679849), (11.1125, -3.175))
            Line((11.1125, -3.175), (12.7, -3.175))
            Line((12.7, -3.175), (12.7, -4.7625))
        make_face()
        with BuildLine():
            ThreePointArc((11.1125, 3.175), (12.2350320151, 3.6399679849), (12.7, 4.7625))
            Line((12.7, 4.7625), (12.7, 3.175))
            Line((12.7, 3.175), (11.1125, 3.175))
        make_face()
        with BuildLine():
            ThreePointArc((12.303125, -3.175), (11.1805929849, -3.6399679849), (10.715625, -4.7625))
            Line((10.715625, -4.7625), (10.715625, -3.175))
            Line((10.715625, -3.175), (12.303125, -3.175))
        make_face()
        with BuildLine():
            ThreePointArc((10.715625, 4.7625), (11.1805929849, 3.6399679849), (12.303125, 3.175))
            Line((12.303125, 3.175), (10.715625, 3.175))
            Line((10.715625, 3.175), (10.715625, 4.7625))
        make_face()
        with BuildLine():
            ThreePointArc((-4.7625, 10.715625), (-3.6399679849, 11.1805929849), (-3.175, 12.303125))
            Line((-3.175, 12.303125), (-3.175, 10.715625))
            Line((-3.175, 10.715625), (-4.7625, 10.715625))
        make_face()
        with BuildLine():
            ThreePointArc((-3.175, 11.1125), (-3.6399679849, 12.2350320151), (-4.7625, 12.7))
            Line((-4.7625, 12.7), (-3.175, 12.7))
            Line((-3.175, 12.7), (-3.175, 11.1125))
        make_face()
        with BuildLine():
            ThreePointArc((4.7625, 12.7), (3.6399679849, 12.2350320151), (3.175, 11.1125))
            Line((3.175, 11.1125), (3.175, 12.7))
            Line((3.175, 12.7), (4.7625, 12.7))
        make_face()
        with BuildLine():
            ThreePointArc((3.175, 12.303125), (3.6399679849, 11.1805929849), (4.7625, 10.715625))
            Line((4.7625, 10.715625), (3.175, 10.715625))
            Line((3.175, 10.715625), (3.175, 12.303125))
        make_face()
        with BuildLine():
            ThreePointArc((-11.1125, 12.7), (-12.2350320151, 12.2350320151), (-12.7, 11.1125))
            Line((-12.7, 11.1125), (-12.7, 12.7))
            Line((-12.7, 12.7), (-11.1125, 12.7))
        make_face()
    extrude(amount=F2_T3_DEPTH, mode=Mode.SUBTRACT)

    # F2_s6 → F2_t5 (cut)
    with BuildSketch(Plane.XZ.offset(-1.984375)):
        with BuildLine():
            ThreePointArc((-8.73125, 12.7), (-9.2332615786, 12.6185347357), (-9.68375, 12.3825))
            ThreePointArc((-9.68375, 12.3825), (-9.5668992086, 12.5225121043), (-9.525, 12.7))
            Line((-9.525, 12.7), (-8.73125, 12.7))
        make_face()
        with BuildLine():
            ThreePointArc((-10.16, 12.3825), (-10.6104884214, 12.6185347357), (-11.1125, 12.7))
            Line((-11.1125, 12.7), (-10.31875, 12.7))
            ThreePointArc((-10.31875, 12.7), (-10.2768507914, 12.5225121043), (-10.16, 12.3825))
        make_face()
    extrude(amount=F2_T5_DEPTH, mode=Mode.SUBTRACT)


solid = f1.part
